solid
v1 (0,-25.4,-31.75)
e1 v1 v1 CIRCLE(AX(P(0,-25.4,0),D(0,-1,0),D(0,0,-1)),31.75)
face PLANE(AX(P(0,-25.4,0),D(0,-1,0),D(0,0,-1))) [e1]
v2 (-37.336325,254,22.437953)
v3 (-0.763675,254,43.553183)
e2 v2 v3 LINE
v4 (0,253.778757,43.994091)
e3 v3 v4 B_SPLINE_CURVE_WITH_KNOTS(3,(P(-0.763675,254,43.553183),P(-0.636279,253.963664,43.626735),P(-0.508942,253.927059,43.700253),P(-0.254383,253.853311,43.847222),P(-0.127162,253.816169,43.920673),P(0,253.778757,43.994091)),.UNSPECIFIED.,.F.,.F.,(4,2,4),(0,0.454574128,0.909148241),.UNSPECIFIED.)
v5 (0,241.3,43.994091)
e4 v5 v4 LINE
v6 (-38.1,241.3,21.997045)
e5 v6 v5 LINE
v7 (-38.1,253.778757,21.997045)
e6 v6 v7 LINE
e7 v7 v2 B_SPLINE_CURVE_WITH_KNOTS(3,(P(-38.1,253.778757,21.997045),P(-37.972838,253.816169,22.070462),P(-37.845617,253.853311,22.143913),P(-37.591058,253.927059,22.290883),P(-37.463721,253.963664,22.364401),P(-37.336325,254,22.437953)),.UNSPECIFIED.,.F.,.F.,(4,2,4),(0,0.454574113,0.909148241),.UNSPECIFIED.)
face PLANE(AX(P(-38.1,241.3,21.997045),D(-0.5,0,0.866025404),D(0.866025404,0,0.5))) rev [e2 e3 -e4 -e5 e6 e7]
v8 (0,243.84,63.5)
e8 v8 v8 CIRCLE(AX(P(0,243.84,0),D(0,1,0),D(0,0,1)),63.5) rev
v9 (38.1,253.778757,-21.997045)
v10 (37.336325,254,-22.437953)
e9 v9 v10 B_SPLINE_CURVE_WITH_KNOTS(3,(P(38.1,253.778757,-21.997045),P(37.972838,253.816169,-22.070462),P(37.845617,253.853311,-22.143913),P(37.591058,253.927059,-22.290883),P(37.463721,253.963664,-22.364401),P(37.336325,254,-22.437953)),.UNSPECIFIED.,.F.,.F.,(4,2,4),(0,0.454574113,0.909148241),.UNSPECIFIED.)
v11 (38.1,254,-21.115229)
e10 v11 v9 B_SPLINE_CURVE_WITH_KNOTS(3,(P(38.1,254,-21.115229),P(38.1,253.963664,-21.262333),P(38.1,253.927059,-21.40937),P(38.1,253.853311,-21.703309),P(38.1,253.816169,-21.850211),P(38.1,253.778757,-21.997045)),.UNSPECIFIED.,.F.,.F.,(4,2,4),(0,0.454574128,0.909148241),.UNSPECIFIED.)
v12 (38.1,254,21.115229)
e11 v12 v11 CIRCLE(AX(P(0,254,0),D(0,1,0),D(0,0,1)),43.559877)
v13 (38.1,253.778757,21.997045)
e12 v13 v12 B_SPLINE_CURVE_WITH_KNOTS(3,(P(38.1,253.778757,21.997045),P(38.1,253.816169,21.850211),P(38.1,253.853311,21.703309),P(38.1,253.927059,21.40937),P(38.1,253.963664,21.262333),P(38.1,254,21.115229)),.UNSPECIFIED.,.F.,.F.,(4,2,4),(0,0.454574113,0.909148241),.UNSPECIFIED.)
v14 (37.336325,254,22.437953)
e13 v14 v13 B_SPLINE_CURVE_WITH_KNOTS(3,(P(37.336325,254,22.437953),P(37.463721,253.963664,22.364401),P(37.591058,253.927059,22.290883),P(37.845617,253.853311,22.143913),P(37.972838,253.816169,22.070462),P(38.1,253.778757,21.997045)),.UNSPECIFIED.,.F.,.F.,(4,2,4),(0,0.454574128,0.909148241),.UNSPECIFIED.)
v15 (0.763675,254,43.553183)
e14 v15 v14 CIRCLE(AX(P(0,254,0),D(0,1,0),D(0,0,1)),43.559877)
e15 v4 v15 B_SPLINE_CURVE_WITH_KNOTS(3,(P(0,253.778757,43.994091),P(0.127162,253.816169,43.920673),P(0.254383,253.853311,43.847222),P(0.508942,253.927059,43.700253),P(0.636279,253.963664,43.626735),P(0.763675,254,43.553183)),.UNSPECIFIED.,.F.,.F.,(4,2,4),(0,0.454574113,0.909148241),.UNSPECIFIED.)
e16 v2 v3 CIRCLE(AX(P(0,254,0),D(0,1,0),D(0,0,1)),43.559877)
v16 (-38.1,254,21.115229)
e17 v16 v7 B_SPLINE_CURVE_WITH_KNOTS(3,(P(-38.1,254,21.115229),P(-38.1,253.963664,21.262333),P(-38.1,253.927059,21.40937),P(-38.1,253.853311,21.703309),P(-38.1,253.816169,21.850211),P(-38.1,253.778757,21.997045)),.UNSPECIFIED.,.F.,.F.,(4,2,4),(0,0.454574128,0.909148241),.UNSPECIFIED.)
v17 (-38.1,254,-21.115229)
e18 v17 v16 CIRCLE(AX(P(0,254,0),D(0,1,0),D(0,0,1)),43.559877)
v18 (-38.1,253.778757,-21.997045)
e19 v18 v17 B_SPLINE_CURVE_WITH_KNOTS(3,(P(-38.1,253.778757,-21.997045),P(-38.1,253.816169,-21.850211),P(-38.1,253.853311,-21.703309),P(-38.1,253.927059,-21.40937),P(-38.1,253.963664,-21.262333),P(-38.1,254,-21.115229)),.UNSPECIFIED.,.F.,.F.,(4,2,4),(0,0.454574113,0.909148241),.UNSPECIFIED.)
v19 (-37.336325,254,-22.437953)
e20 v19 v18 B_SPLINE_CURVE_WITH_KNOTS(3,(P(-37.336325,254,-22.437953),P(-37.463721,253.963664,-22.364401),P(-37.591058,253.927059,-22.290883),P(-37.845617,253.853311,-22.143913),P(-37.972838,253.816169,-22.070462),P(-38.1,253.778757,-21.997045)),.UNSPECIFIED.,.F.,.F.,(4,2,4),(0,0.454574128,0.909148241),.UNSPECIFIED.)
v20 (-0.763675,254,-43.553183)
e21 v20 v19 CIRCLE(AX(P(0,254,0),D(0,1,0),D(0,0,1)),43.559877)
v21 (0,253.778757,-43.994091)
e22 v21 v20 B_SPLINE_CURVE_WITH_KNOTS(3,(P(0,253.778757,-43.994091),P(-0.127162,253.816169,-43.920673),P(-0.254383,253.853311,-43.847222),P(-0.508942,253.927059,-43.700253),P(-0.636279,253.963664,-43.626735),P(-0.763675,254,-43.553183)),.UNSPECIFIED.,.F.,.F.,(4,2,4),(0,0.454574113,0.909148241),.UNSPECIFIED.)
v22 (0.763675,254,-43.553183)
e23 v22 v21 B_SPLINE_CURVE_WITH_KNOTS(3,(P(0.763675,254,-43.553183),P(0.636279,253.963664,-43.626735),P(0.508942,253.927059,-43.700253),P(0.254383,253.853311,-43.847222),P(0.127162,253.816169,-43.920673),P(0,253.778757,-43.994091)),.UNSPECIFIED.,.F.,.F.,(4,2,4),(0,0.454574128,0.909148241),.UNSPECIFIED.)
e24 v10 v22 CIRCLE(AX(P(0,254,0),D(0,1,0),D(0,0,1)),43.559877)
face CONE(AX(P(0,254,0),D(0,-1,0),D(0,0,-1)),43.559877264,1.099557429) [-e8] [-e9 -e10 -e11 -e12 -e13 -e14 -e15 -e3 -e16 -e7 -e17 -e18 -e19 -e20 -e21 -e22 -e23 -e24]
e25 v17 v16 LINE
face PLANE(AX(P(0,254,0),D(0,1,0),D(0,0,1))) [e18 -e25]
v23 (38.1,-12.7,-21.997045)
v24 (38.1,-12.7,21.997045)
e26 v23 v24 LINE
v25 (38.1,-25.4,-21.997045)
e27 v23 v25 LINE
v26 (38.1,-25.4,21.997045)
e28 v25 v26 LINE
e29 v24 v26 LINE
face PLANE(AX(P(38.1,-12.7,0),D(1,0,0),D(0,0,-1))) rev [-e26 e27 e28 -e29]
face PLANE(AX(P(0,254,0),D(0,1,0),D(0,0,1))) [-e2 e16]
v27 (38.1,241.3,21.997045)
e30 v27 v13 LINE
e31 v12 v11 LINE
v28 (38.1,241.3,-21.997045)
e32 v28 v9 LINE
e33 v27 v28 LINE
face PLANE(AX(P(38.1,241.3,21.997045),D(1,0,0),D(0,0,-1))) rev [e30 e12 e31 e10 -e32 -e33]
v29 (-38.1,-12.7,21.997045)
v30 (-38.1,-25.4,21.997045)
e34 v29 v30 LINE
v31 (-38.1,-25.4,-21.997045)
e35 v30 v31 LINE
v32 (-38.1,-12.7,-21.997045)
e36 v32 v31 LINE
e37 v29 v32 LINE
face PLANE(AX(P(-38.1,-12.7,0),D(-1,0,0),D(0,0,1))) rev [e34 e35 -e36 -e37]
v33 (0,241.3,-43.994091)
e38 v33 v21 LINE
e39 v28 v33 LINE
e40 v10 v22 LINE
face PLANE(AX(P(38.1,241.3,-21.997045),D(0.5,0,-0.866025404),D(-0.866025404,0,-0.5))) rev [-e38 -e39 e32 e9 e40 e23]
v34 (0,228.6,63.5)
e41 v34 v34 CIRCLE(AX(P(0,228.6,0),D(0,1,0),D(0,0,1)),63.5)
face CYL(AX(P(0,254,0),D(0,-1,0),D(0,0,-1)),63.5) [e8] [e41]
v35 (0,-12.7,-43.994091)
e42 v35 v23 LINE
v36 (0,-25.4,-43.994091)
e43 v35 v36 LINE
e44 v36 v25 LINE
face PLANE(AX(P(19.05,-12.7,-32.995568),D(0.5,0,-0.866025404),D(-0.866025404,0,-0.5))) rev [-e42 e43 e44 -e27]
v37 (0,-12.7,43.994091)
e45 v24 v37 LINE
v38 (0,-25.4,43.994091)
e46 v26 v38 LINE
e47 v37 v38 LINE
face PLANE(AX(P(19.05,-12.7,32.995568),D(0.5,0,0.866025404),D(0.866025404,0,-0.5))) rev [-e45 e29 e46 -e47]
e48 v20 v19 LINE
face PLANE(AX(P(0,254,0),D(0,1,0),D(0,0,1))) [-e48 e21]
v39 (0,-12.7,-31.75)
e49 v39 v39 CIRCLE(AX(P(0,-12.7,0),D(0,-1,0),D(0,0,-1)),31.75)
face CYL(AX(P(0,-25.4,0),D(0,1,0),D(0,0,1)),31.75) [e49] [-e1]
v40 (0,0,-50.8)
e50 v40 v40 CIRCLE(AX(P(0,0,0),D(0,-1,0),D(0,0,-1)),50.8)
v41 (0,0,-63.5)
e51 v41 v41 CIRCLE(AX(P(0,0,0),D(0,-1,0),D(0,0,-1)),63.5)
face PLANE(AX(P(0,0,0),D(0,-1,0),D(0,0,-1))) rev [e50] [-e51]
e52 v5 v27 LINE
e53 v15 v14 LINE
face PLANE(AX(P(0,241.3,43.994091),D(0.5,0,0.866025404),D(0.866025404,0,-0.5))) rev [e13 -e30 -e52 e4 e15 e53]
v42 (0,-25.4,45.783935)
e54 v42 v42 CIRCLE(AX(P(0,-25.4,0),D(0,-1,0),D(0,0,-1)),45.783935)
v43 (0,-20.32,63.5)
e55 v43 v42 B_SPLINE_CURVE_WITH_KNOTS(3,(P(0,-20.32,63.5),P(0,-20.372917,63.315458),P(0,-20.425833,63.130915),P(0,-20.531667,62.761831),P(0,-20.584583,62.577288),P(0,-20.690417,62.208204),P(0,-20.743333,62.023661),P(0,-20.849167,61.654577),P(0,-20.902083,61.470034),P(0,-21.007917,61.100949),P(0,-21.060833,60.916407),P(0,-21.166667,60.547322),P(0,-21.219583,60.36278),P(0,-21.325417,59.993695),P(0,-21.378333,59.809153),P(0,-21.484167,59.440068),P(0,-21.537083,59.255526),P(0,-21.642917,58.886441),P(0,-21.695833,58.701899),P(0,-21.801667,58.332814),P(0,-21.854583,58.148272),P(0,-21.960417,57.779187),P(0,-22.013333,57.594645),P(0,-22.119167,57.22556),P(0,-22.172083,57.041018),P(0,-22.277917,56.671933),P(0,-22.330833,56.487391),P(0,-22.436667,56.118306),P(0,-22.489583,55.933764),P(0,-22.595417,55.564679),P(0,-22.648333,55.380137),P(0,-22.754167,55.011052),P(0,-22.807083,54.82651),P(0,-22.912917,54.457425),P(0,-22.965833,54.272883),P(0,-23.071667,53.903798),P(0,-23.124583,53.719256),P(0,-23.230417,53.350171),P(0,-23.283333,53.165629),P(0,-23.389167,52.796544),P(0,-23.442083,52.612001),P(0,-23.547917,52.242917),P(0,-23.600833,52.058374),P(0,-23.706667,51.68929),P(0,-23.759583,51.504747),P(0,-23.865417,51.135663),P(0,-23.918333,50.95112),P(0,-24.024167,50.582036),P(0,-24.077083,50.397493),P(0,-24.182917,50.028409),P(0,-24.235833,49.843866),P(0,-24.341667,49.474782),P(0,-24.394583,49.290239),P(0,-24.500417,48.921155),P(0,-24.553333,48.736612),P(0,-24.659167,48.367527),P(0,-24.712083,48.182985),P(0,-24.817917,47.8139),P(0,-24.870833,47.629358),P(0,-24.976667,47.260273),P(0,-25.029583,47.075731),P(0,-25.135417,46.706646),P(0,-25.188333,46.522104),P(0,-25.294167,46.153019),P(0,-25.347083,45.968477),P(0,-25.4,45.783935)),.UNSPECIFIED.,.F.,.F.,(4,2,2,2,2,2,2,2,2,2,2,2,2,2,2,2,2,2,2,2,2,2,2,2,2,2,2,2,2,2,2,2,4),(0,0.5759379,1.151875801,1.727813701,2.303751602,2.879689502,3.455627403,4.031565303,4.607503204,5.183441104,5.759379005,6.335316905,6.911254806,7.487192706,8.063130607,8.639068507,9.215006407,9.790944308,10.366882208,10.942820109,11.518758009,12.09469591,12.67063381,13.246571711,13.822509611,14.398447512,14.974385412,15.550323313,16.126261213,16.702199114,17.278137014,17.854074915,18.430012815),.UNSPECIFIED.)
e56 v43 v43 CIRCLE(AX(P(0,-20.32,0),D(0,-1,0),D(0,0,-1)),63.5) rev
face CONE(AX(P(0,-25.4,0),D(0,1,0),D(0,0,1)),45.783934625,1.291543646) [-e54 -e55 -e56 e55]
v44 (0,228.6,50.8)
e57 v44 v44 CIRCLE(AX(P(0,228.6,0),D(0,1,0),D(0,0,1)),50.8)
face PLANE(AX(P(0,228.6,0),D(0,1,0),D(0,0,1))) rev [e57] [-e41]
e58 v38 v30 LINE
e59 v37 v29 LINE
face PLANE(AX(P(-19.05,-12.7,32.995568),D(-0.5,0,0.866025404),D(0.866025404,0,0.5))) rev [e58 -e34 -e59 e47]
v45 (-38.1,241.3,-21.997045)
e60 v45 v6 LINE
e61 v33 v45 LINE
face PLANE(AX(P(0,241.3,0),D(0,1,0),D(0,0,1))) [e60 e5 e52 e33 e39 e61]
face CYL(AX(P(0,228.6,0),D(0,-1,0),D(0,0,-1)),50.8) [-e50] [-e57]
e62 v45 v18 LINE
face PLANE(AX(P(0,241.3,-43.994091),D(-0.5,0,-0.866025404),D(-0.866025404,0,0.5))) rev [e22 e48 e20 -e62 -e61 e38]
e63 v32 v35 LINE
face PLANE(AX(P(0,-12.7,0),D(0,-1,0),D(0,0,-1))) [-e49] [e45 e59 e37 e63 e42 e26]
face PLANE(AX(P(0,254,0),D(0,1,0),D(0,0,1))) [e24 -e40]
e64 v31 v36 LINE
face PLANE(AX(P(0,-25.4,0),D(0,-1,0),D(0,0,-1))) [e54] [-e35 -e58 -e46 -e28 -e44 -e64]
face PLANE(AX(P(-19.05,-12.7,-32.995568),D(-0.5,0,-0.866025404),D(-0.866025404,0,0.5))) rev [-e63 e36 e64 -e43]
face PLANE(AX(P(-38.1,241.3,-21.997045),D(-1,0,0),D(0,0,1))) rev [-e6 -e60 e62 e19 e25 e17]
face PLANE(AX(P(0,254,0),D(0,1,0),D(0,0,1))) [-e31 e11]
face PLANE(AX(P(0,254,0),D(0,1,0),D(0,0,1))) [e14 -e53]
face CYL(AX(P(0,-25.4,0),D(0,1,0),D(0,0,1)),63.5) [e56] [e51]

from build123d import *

# Parameters (mm, degrees)
SKETCH1_R           = 50.8
BOSS_EXTRUDE1_DEPTH = 228.6
SKETCH2_R           = 63.5
BOSS_EXTRUDE2_DEPTH = 25.4
BOSS_EXTRUDE3_START = 25.4
SKETCH3_R           = 63.5
BOSS_EXTRUDE3_DEPTH = 25.4
CUT_EXTRUDE2_DEPTH  = 12.7
CHAMFER2_SIZE       = 10.16
CHAMFER2_SIZE_2     = 19.940122736
SKETCH5_R           = 38.1
CUT_EXTRUDE5_DEPTH  = 12.7
CHAMFER3_SIZE       = 5.08
CHAMFER3_SIZE2      = 17.716065375
SKETCH6_R           = 31.75
BOSS_EXTRUDE6_DEPTH = 12.7


with BuildPart() as part:
    # Sketch1 → Boss-Extrude1 (new body)
    with BuildSketch(Plane(origin=(0, 0, 0), x_dir=(1, 0, 0), z_dir=(0, 1, 0))):
        with Locations(Location((0, 0, 0), (0, 0, 270))):
            Circle(SKETCH1_R)
    extrude(amount=BOSS_EXTRUDE1_DEPTH)

    # Sketch2 → Boss-Extrude2 (add)
    with BuildSketch(Plane(origin=(0, 228.6, 0), x_dir=(1, 0, 0), z_dir=(0, 1, 0))):
        with Locations(Location((0, 0, 0), (0, 0, 270))):
            Circle(SKETCH2_R)
    extrude(amount=BOSS_EXTRUDE2_DEPTH)

    # Sketch3 → Boss-Extrude3 (add)
    with BuildSketch(Plane.XZ.offset(BOSS_EXTRUDE3_START)):
        with Locations(Location((0, 0, 0), (0, 0, 90))):
            Circle(SKETCH3_R)
    extrude(amount=-BOSS_EXTRUDE3_DEPTH)

    # Sketch4 → Cut-Extrude2 (cut)
    with BuildSketch(Plane(origin=(0, 254, 0), x_dir=(1, 0, 0), z_dir=(0, 1, 0))):
        Polygon((0, 43.994090512), (-38.1, 21.997045256), (-38.1, -21.997045256), (0, -43.994090512), (38.1, -21.997045256), (38.1, 21.997045256), align=None)
    extrude(amount=-CUT_EXTRUDE2_DEPTH, mode=Mode.SUBTRACT)

    # Chamfer2
    # the kernel refuses this chamfer: 19.940122736, 10.16 mm, written as the material it takes off along each edge
    with BuildSketch(Plane(origin=(0, 254, 0), x_dir=(0, 0, 1), z_dir=(-1, 0, 0))) as chamfer2_piece_1:
        Polygon((63.5, -CHAMFER2_SIZE), (63.5 - CHAMFER2_SIZE_2, 0), (63.5, 0), align=None)
    revolve(axis=Axis((0, 254, 0), (0, 1, 0)), mode=Mode.SUBTRACT)

    # Sketch5 → Cut-Extrude5 (cut)
    with BuildSketch(Plane.XZ.offset(25.4)):
        Circle(SKETCH5_R)
        with BuildLine():
            Line((19.049999468, 32.995568191), (0, 43.994090512))
            Line((0, 43.994090512), (-19.04999937, 32.995568248))
            ThreePointArc((-19.04999937, 32.995568248), (5.7e-08, 38.1), (19.049999468, 32.995568191))
        make_face()
        with BuildLine():
            Line((38.1, 21.997045256), (19.049999468, 32.995568191))
            ThreePointArc((19.049999468, 32.995568191), (32.995567731, 19.050000266), (38.1, 0))
            Line((38.1, 0), (38.1, 21.997045256))
        make_face()
        with BuildLine():
            ThreePointArc((-38.1, -1.79e-07), (-32.995567747, 19.050000238), (-19.04999937, 32.995568248))
            Line((-19.04999937, 32.995568248), (-38.1, 21.997045256))
            Line((-38.1, 21.997045256), (-38.1, -1.79e-07))
        make_face()
        with BuildLine():
            ThreePointArc((-19.049999051, -32.995568432), (-32.995567566, -19.050000552), (-38.1, -1.79e-07))
            Line((-38.1, -1.79e-07), (-38.1, -21.997045256))
            Line((-38.1, -21.997045256), (-19.049999051, -32.995568432))
        make_face()
        with BuildLine():
            Line((38.1, -21.997045256), (38.1, 0))
            ThreePointArc((38.1, 0), (32.995567731, -19.050000266), (19.049999468, -32.995568191))
            Line((19.049999468, -32.995568191), (38.1, -21.997045256))
        make_face()
        with BuildLine():
            ThreePointArc((19.049999468, -32.995568191), (2.4e-07, -38.1), (-19.049999051, -32.995568432))
            Line((-19.049999051, -32.995568432), (0, -43.994090512))
            Line((0, -43.994090512), (19.049999468, -32.995568191))
        make_face()
    extrude(amount=-CUT_EXTRUDE5_DEPTH, mode=Mode.SUBTRACT)

    # Chamfer3
    chamfer3_edges = [part.edges().sort_by_distance(p)[0] for p in [
        (0, -25.4, -63.5),
    ]]
    chamfer3_side = [part.faces().sort_by_distance(p)[0] for p in [
        (0, -12.7, -63.5),
    ]]
    chamfer(chamfer3_edges, length=CHAMFER3_SIZE, length2=CHAMFER3_SIZE2, reference=chamfer3_side[0])

    # Sketch6 → Boss-Extrude6 (add)
    with BuildSketch(Plane.XZ.offset(12.7)):
        with Locations(Location((0, 0, 0), (0, 0, 270))):
            Circle(SKETCH6_R)
    extrude(amount=BOSS_EXTRUDE6_DEPTH)


solid = part.part
